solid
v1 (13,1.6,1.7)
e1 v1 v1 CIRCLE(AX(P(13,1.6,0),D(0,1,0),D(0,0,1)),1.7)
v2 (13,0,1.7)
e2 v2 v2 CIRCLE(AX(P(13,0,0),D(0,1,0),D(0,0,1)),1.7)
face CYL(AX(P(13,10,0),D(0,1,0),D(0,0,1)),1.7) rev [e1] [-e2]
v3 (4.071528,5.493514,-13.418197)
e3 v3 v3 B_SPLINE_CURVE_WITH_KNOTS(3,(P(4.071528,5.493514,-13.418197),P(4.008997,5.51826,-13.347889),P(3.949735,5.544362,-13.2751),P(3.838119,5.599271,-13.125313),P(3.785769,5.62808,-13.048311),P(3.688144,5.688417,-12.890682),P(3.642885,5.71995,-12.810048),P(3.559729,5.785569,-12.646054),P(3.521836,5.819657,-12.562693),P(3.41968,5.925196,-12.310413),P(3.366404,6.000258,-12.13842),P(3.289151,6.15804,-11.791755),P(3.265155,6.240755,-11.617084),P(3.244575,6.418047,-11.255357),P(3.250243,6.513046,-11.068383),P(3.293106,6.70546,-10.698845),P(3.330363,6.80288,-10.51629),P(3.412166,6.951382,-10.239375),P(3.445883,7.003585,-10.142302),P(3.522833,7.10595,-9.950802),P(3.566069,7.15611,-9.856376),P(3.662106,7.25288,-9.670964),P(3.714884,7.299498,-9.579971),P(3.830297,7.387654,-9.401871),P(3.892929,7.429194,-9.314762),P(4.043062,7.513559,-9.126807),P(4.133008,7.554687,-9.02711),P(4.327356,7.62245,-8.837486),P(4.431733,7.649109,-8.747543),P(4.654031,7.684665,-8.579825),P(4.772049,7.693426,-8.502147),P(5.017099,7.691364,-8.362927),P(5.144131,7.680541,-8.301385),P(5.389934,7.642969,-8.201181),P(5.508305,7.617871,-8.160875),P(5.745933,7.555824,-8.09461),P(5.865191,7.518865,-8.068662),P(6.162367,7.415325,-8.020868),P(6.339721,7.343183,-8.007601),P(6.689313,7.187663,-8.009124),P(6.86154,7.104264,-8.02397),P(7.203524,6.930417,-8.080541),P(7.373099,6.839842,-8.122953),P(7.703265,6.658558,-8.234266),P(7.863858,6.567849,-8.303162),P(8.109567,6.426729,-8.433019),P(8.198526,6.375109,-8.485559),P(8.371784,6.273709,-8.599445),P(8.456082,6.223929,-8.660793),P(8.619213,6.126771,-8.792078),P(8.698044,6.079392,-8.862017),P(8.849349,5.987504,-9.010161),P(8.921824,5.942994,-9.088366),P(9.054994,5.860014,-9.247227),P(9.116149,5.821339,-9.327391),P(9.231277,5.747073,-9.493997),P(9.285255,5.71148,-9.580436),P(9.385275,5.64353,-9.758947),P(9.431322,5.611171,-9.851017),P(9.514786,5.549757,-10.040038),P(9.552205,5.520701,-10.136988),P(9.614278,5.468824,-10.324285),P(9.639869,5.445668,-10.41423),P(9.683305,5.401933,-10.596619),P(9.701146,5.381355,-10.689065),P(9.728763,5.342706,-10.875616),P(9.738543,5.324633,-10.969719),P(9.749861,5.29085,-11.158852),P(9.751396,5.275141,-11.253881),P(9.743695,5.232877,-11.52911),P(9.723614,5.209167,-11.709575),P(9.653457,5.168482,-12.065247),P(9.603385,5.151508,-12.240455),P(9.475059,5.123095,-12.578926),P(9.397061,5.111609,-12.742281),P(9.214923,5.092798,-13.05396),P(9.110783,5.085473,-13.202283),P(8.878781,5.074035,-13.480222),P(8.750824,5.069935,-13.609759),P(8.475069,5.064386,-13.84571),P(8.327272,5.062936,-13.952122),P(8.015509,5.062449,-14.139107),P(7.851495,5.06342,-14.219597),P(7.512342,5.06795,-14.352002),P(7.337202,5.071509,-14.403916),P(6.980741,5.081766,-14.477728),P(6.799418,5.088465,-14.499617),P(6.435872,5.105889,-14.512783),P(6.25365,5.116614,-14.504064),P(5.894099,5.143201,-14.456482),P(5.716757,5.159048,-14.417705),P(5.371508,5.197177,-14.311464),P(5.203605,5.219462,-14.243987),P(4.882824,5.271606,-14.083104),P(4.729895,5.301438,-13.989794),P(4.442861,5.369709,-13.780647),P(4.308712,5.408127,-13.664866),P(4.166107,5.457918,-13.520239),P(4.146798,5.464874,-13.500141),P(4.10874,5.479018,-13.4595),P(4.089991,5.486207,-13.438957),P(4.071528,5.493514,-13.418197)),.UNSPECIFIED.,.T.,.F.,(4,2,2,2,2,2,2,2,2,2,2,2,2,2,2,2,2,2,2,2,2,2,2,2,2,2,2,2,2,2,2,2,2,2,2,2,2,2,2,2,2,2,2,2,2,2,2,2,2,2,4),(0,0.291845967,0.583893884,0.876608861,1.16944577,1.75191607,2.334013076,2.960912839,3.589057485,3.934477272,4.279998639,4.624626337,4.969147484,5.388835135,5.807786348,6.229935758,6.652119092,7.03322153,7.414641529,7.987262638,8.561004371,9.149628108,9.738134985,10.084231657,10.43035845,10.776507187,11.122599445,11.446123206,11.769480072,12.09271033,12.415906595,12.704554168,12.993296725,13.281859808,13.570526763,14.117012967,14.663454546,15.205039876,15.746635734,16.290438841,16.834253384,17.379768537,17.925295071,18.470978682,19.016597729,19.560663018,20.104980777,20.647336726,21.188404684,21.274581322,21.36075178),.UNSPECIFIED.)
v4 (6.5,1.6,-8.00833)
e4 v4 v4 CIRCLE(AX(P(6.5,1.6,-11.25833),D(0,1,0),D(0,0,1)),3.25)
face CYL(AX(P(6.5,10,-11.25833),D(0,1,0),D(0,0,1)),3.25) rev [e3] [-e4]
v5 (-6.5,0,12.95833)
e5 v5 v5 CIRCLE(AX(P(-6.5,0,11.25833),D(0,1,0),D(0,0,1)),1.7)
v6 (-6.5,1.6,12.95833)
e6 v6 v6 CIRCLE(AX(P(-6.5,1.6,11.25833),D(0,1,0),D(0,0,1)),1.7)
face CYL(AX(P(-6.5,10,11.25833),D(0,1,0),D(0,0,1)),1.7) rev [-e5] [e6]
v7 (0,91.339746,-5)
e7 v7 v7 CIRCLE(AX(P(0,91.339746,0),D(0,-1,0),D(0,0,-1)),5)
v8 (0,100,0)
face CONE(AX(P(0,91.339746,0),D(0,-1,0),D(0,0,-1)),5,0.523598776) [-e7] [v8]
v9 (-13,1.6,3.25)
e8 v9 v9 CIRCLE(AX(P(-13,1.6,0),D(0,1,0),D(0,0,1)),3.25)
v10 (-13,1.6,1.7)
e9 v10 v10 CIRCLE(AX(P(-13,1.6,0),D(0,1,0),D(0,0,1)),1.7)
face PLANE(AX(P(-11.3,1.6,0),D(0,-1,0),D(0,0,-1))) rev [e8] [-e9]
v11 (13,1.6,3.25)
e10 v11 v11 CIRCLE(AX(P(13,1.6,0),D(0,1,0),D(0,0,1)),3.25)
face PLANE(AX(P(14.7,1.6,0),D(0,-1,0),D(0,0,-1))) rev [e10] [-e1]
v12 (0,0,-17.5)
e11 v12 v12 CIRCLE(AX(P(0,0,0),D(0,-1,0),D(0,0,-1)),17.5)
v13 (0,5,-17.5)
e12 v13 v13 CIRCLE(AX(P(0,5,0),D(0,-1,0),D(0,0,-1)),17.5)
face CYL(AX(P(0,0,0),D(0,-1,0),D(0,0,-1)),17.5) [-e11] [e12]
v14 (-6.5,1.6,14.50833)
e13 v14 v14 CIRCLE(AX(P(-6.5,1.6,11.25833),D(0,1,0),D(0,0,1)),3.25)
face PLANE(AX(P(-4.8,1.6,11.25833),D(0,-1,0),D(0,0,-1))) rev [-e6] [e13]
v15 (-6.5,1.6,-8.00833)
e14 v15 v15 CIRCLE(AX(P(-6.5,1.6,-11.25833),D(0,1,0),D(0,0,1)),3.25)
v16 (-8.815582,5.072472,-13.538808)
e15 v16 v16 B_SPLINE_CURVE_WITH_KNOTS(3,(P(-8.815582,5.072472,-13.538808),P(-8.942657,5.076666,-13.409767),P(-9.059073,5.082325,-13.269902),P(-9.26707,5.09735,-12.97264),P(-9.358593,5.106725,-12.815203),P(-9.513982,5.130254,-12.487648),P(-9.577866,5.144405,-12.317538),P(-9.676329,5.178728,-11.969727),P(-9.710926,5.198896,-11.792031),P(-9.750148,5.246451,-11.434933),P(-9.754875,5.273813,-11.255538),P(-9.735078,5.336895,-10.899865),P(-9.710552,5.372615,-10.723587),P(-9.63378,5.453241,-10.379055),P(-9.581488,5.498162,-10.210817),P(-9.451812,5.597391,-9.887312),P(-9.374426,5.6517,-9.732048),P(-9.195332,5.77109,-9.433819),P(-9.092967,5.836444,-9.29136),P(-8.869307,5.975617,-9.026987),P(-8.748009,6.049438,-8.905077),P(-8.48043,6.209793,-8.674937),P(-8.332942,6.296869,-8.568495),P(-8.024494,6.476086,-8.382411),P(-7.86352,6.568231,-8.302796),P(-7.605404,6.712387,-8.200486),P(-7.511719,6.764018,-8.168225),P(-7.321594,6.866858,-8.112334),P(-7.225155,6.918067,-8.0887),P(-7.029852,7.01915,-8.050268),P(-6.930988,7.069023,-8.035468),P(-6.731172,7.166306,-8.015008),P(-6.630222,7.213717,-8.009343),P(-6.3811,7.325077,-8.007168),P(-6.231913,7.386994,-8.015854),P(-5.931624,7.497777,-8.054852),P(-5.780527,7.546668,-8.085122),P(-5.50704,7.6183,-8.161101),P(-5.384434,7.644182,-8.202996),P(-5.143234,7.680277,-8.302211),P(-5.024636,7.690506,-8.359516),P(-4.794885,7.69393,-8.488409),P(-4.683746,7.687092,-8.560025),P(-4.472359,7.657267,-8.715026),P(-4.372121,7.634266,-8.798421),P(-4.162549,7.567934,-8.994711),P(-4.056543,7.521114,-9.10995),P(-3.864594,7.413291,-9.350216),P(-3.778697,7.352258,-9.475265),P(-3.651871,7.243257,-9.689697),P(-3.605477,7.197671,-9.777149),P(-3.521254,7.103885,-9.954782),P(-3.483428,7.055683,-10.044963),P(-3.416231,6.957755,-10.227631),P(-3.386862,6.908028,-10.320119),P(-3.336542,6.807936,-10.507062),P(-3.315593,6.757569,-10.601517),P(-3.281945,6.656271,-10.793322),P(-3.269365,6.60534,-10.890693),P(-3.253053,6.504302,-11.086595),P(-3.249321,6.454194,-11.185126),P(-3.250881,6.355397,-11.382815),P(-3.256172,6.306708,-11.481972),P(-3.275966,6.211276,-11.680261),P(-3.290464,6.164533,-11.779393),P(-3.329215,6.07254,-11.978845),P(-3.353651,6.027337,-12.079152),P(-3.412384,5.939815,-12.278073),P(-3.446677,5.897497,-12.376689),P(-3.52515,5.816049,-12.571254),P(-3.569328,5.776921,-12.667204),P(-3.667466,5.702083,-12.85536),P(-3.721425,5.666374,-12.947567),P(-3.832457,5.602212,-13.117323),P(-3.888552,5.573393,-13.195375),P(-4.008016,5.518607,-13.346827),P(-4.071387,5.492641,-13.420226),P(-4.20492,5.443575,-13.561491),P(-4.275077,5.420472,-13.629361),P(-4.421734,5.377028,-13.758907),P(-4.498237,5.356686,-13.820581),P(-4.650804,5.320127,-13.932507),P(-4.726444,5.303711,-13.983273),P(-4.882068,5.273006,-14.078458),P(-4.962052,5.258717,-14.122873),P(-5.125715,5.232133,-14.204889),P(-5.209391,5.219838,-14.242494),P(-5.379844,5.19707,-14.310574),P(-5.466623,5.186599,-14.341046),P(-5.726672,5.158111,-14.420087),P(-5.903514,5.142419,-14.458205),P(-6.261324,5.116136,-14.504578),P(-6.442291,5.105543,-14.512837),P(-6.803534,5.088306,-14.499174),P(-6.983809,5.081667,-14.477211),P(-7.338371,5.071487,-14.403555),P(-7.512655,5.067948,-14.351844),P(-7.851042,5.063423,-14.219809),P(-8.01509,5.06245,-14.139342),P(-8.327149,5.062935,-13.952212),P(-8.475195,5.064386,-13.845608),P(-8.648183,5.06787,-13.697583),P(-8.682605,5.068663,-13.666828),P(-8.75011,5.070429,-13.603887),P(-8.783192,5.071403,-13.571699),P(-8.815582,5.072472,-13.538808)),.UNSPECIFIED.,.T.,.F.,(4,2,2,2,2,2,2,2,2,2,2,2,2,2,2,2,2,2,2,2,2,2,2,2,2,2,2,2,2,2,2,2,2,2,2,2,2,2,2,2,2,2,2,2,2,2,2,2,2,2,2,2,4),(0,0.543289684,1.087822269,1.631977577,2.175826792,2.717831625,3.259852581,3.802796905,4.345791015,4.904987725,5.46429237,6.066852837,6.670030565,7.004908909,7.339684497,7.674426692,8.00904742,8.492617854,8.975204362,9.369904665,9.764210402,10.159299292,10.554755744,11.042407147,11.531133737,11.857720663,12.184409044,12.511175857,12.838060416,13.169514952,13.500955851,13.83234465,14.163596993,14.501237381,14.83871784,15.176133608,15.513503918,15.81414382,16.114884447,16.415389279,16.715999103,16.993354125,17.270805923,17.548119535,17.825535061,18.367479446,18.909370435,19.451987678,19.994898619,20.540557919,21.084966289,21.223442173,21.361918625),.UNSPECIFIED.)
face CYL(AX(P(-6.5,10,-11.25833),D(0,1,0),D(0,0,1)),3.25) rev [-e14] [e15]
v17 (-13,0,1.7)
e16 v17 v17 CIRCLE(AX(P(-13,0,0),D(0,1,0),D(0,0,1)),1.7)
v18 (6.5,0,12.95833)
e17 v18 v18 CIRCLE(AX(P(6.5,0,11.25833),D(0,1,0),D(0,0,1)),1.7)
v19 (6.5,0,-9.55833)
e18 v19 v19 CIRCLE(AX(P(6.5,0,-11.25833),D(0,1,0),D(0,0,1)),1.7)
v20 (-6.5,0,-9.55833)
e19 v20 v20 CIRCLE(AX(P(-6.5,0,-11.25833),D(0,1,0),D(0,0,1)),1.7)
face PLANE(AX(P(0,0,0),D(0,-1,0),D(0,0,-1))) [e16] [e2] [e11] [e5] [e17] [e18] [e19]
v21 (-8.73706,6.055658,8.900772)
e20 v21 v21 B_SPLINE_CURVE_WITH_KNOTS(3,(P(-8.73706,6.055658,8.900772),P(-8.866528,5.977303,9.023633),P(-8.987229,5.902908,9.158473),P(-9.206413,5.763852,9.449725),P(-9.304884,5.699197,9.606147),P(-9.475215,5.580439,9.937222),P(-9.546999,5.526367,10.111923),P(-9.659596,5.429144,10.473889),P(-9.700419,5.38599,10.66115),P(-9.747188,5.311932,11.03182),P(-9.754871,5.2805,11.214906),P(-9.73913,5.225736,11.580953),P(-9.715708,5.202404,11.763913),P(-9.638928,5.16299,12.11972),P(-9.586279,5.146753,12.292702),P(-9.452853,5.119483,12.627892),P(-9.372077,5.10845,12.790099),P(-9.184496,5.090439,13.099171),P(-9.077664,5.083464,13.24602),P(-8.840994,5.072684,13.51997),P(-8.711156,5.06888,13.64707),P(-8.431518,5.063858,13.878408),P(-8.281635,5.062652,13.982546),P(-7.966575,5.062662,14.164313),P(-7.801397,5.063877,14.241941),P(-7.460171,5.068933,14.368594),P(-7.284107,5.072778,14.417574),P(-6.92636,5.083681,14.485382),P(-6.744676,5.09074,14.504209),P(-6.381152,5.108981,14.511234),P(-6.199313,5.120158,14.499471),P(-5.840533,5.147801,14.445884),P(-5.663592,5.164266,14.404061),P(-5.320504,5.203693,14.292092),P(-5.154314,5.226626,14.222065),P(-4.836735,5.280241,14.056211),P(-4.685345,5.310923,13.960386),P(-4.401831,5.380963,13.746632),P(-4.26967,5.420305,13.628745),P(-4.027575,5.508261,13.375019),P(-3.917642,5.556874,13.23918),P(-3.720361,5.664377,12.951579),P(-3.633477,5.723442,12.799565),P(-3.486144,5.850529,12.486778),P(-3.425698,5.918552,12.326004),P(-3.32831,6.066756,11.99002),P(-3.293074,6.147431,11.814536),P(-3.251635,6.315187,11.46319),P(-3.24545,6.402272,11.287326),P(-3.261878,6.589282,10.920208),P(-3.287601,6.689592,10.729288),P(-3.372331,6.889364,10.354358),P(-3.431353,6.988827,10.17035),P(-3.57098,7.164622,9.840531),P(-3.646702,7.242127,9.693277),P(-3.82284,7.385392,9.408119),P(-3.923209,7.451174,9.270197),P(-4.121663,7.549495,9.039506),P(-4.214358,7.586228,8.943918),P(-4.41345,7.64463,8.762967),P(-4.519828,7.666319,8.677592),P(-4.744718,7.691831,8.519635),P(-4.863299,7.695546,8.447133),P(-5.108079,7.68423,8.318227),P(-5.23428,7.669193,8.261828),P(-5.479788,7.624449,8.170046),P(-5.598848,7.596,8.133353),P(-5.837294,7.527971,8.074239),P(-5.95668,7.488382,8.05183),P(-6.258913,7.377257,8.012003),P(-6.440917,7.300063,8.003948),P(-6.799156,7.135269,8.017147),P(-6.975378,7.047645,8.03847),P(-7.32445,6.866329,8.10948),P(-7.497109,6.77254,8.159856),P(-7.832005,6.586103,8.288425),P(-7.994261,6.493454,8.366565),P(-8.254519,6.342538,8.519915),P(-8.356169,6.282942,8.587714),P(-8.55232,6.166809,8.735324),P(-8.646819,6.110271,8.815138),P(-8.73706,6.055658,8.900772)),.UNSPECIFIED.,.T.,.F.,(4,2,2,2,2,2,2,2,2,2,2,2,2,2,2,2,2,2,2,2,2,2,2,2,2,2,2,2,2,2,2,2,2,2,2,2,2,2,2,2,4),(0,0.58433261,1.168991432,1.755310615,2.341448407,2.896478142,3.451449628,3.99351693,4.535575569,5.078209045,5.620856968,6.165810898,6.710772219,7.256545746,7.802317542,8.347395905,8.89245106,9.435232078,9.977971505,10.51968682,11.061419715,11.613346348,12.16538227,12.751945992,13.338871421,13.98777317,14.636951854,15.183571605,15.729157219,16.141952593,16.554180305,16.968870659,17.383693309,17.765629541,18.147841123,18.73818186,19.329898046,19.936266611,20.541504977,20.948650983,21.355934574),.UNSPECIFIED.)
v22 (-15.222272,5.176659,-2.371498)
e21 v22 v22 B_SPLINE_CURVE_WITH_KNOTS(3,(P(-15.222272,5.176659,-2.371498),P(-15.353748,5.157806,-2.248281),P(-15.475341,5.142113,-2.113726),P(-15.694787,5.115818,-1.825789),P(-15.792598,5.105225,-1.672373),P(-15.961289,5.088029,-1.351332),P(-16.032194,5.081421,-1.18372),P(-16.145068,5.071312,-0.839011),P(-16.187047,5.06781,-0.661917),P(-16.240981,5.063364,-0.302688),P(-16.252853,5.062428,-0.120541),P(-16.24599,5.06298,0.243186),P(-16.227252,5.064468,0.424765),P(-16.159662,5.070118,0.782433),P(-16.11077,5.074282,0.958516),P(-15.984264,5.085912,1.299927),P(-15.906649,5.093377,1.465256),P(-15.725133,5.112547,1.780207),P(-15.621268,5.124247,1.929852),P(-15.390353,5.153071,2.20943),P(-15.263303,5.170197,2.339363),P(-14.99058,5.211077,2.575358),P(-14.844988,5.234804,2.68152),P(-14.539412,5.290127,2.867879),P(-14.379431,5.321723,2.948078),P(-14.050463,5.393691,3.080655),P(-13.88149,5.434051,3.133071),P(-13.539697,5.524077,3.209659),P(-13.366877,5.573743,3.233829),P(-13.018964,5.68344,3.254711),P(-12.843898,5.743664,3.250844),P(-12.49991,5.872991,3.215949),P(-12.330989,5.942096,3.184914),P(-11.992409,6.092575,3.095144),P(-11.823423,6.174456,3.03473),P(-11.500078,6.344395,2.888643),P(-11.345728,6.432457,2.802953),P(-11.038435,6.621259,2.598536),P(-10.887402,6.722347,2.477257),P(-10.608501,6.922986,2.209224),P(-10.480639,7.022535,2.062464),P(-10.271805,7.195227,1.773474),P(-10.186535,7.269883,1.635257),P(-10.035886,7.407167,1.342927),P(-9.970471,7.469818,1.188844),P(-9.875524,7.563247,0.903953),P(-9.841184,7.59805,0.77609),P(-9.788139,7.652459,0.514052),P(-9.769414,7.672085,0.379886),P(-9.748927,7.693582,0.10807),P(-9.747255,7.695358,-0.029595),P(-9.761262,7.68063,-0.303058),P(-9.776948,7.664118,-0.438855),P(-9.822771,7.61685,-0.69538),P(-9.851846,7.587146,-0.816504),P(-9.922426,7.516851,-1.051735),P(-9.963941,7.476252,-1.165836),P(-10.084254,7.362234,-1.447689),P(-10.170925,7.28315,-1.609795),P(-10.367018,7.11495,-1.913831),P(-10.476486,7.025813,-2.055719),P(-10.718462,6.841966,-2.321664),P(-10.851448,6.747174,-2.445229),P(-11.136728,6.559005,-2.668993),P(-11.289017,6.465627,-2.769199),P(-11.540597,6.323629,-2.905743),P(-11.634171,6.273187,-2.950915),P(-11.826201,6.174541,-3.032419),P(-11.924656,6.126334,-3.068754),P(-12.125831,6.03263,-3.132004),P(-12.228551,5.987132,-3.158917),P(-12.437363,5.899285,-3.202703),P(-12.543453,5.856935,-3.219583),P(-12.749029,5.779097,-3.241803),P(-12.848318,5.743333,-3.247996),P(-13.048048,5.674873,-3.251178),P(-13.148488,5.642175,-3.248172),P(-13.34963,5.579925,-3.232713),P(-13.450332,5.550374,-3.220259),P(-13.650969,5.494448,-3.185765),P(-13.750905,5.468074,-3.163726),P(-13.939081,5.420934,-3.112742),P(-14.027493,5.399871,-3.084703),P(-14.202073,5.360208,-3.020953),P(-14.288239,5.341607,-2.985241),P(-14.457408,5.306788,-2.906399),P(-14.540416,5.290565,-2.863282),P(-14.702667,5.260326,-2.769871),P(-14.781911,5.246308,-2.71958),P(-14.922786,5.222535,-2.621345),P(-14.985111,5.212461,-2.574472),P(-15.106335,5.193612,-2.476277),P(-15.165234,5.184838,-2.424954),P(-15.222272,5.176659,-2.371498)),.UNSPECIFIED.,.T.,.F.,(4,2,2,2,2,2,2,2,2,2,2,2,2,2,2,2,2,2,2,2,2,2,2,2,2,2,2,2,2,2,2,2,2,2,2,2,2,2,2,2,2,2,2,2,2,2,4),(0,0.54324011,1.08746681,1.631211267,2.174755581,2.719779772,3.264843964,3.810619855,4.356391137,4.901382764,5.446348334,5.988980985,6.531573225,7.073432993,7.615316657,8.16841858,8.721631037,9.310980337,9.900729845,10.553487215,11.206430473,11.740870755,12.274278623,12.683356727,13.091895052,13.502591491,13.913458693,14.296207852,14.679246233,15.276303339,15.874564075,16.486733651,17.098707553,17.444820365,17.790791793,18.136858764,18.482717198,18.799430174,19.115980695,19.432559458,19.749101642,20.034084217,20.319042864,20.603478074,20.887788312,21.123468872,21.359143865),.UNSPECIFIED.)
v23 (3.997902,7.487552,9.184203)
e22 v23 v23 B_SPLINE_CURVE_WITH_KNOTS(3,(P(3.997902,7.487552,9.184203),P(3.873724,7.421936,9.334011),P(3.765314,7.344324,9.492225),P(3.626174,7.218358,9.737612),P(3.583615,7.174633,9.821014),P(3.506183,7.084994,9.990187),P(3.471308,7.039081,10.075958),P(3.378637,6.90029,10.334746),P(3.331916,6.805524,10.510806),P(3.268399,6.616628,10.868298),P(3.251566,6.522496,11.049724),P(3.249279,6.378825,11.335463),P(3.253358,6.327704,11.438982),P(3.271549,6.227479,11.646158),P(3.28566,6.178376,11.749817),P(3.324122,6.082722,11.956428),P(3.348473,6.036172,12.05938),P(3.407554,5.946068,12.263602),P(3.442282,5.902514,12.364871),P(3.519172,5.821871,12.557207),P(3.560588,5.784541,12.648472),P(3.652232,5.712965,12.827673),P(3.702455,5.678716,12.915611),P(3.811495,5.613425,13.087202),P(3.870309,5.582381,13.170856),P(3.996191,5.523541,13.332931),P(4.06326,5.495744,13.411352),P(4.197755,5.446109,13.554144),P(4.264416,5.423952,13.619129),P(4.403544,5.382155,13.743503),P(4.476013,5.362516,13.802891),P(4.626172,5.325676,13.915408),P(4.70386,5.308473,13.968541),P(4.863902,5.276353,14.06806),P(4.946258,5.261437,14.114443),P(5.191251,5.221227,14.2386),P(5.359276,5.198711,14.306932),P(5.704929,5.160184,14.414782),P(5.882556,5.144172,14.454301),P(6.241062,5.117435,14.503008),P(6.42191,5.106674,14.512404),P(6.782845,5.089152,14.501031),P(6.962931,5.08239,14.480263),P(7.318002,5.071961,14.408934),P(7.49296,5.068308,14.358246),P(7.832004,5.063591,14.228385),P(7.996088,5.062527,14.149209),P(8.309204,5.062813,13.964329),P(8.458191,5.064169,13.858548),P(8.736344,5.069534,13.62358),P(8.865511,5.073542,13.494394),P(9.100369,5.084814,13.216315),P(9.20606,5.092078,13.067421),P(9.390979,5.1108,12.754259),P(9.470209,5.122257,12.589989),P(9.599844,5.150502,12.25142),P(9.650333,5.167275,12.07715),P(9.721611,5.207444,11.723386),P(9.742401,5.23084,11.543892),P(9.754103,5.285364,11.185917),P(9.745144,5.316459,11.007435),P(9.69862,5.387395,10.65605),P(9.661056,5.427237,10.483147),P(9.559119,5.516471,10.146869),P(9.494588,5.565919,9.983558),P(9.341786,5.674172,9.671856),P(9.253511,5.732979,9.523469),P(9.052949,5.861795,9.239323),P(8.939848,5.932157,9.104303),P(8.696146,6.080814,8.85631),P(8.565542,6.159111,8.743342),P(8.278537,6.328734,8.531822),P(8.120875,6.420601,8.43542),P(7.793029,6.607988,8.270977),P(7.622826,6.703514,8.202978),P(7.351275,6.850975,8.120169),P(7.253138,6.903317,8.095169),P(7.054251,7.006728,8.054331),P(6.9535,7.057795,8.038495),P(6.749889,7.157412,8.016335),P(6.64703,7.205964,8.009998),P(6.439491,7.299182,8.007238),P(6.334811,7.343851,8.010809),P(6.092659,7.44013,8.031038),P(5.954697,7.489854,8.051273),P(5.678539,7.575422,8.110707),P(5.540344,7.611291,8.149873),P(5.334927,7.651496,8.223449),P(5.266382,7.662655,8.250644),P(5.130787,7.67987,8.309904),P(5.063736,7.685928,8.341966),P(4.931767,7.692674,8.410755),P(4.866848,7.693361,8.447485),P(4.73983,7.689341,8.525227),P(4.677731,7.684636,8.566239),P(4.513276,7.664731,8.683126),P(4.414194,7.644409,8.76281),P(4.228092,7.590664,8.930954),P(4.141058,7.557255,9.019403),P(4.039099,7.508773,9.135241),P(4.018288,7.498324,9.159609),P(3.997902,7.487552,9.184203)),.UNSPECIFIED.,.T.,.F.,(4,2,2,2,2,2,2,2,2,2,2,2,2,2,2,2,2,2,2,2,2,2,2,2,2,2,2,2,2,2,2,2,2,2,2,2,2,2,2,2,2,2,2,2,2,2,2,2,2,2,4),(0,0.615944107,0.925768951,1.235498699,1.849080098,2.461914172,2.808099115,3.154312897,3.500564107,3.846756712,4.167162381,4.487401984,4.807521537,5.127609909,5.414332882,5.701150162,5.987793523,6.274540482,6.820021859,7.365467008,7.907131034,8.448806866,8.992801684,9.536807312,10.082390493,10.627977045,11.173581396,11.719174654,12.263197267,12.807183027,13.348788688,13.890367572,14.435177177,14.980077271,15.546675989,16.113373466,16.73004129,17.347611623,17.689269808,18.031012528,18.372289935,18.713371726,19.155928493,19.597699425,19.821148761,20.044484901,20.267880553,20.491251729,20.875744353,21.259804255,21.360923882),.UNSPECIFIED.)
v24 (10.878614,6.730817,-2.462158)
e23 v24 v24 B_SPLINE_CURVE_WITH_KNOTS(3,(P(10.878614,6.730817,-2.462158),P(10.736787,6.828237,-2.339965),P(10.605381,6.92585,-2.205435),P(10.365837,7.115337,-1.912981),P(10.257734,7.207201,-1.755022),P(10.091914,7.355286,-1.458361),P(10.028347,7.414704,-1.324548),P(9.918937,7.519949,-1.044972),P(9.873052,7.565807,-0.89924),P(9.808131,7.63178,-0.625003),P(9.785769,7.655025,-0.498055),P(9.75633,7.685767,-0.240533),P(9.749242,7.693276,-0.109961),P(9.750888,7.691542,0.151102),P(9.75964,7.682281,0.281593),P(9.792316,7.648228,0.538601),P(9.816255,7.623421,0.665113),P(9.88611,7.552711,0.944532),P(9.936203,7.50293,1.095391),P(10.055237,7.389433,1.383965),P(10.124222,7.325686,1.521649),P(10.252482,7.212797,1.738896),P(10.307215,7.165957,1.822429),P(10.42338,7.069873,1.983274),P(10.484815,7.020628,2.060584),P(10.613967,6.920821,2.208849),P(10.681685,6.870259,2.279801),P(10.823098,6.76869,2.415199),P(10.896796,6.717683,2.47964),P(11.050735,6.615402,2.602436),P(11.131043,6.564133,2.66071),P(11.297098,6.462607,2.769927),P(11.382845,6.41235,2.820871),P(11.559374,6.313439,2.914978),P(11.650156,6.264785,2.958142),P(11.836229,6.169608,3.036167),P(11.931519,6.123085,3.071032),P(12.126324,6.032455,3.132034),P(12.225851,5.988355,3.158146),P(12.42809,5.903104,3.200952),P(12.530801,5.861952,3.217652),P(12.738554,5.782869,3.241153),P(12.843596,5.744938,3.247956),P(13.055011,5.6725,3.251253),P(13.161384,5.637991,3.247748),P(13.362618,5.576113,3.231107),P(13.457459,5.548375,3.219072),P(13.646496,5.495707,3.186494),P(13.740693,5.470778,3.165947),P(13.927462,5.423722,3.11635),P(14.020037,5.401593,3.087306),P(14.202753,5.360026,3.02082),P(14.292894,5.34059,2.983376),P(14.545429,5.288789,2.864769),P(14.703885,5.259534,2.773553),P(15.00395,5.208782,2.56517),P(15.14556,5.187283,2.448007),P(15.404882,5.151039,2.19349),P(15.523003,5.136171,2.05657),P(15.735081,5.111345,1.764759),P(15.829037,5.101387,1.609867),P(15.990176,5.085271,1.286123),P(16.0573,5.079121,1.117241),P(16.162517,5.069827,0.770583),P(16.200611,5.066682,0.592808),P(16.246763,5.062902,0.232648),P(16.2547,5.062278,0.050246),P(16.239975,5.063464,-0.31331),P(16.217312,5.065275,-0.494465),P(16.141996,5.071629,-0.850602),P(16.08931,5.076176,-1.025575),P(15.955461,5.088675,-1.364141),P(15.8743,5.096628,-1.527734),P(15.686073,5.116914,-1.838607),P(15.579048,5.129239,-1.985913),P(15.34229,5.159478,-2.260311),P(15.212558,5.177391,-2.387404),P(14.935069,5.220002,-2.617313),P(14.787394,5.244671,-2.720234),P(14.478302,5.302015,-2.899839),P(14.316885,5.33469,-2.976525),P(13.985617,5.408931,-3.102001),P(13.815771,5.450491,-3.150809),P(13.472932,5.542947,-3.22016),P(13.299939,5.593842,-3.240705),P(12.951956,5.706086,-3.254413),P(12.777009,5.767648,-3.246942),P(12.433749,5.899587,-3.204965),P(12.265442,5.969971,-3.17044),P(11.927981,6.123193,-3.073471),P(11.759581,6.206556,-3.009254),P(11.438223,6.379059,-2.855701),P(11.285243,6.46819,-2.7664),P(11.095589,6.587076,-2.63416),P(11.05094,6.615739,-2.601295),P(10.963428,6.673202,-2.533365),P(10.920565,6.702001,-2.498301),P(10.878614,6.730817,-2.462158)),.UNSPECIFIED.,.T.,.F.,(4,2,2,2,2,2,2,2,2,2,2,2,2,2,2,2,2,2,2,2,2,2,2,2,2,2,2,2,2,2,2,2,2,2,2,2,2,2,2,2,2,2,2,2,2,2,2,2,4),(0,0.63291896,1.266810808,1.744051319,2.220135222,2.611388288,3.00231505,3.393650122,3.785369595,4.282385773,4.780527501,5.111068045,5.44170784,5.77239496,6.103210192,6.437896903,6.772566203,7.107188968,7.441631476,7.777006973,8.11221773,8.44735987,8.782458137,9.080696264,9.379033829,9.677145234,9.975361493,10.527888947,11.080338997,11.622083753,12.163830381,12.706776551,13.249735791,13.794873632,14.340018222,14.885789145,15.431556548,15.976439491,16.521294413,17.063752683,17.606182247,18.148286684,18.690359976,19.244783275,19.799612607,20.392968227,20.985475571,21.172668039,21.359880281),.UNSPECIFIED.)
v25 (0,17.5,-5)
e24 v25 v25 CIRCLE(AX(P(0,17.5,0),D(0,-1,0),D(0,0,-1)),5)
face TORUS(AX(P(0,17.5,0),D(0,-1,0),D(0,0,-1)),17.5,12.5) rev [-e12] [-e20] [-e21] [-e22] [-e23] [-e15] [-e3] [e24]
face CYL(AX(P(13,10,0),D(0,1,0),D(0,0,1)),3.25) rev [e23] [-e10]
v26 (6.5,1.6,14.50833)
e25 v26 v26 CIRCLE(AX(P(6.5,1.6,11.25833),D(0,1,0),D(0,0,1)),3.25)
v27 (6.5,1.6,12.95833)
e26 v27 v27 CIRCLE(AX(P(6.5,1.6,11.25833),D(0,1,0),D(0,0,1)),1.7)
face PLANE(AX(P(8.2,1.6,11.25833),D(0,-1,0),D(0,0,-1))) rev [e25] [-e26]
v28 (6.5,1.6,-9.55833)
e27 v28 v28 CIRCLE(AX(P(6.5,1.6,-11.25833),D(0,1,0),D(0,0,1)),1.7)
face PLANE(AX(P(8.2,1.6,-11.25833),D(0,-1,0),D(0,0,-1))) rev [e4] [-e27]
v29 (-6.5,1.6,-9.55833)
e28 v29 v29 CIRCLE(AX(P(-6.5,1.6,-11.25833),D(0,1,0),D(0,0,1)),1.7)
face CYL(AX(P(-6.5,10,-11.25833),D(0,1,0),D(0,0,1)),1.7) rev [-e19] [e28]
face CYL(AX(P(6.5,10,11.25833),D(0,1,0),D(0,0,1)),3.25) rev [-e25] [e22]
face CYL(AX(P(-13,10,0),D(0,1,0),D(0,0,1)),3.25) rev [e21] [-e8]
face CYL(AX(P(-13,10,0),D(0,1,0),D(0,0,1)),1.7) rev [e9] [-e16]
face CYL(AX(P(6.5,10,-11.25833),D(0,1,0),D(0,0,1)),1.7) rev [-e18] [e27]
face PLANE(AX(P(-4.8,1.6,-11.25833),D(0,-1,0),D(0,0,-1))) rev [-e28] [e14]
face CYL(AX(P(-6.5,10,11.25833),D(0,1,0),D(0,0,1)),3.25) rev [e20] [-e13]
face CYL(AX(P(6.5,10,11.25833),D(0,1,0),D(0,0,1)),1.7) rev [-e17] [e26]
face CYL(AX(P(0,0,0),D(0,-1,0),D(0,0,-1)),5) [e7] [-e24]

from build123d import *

# Parameters (mm, degrees)
CBORE_START                                   = 1.6
CBORE_FOR_M3_HEX_SOCKET_HEAD_CAP_SCR_2_R      = 3.25
CBORE_FOR_M3_HEX_SOCKET_HEAD_CAP_SCREW1_DEPTH = 6.092474541
CBORE_FOR_M3_HEX_SOCKET_HEAD_CAP_SCR_3_O_R    = 1.7
CBORE_FOR_M3_HEX_SOCKET_HEAD_CAP_SCR_3_DEPTH  = 1.6


with BuildPart() as part:
    # Sketch1 → Revolve1 (revolve)
    with BuildSketch(Plane.XY, mode=Mode.PRIVATE) as revolve1_sk:
        with BuildLine():
            Line((0, 0), (17.5, 0))
            Line((17.5, 0), (17.5, 5))
            ThreePointArc((17.5, 5), (8.661165235, 8.661165235), (5, 17.5))
            Line((5, 17.5), (5, 91.339745962))
            Line((5, 91.339745962), (0, 100))
            Line((0, 100), (0, 0))
        make_face()
    revolve(revolve1_sk.sketch.rotate(Axis((0, 0, 0), (0, 1, 0)), 90), axis=Axis((0, 0, 0), (0, 1, 0)))

    # CBORE for M3 Hex Socket Head Cap Screw1: read off the stored shape, not the designer's step
    # CBORE for M3 Hex Socket Head Cap Scr 2 → CBORE for M3 Hex Socket Head Cap Screw1 (cut)
    with BuildSketch(Plane(origin=(0, 0, 0), x_dir=(1, 0, 0), z_dir=(0, 1, 0)).offset(CBORE_START)):
        with Locations((-6.5, -11.258330249)):
            Circle(CBORE_FOR_M3_HEX_SOCKET_HEAD_CAP_SCR_2_R)
        with Locations((6.5, -11.258330249)):
            Circle(CBORE_FOR_M3_HEX_SOCKET_HEAD_CAP_SCR_2_R)
        with Locations((13, 0)):
            Circle(CBORE_FOR_M3_HEX_SOCKET_HEAD_CAP_SCR_2_R)
        with Locations((6.5, 11.258330249)):
            Circle(CBORE_FOR_M3_HEX_SOCKET_HEAD_CAP_SCR_2_R)
        with Locations((-6.5, 11.258330249)):
            Circle(CBORE_FOR_M3_HEX_SOCKET_HEAD_CAP_SCR_2_R)
        with Locations((-13, 0)):
            Circle(CBORE_FOR_M3_HEX_SOCKET_HEAD_CAP_SCR_2_R)
    extrude(amount=CBORE_FOR_M3_HEX_SOCKET_HEAD_CAP_SCREW1_DEPTH, mode=Mode.SUBTRACT)

    # CBORE for M3 Hex Socket Head Cap Scr 3 o → CBORE for M3 Hex Socket Head Cap Scr 3 (cut)
    with BuildSketch(Plane(origin=(0, 0, 0), x_dir=(1, 0, 0), z_dir=(0, 1, 0))):
        with Locations((-6.5, -11.258330249)):
            Circle(CBORE_FOR_M3_HEX_SOCKET_HEAD_CAP_SCR_3_O_R)
        with Locations((6.5, -11.258330249)):
            Circle(CBORE_FOR_M3_HEX_SOCKET_HEAD_CAP_SCR_3_O_R)
        with Locations((13, 0)):
            Circle(CBORE_FOR_M3_HEX_SOCKET_HEAD_CAP_SCR_3_O_R)
        with Locations((6.5, 11.258330249)):
            Circle(CBORE_FOR_M3_HEX_SOCKET_HEAD_CAP_SCR_3_O_R)
        with Locations((-6.5, 11.258330249)):
            Circle(CBORE_FOR_M3_HEX_SOCKET_HEAD_CAP_SCR_3_O_R)
        with Locations((-13, 0)):
            Circle(CBORE_FOR_M3_HEX_SOCKET_HEAD_CAP_SCR_3_O_R)
    extrude(amount=CBORE_FOR_M3_HEX_SOCKET_HEAD_CAP_SCR_3_DEPTH, mode=Mode.SUBTRACT)


solid = part.part
